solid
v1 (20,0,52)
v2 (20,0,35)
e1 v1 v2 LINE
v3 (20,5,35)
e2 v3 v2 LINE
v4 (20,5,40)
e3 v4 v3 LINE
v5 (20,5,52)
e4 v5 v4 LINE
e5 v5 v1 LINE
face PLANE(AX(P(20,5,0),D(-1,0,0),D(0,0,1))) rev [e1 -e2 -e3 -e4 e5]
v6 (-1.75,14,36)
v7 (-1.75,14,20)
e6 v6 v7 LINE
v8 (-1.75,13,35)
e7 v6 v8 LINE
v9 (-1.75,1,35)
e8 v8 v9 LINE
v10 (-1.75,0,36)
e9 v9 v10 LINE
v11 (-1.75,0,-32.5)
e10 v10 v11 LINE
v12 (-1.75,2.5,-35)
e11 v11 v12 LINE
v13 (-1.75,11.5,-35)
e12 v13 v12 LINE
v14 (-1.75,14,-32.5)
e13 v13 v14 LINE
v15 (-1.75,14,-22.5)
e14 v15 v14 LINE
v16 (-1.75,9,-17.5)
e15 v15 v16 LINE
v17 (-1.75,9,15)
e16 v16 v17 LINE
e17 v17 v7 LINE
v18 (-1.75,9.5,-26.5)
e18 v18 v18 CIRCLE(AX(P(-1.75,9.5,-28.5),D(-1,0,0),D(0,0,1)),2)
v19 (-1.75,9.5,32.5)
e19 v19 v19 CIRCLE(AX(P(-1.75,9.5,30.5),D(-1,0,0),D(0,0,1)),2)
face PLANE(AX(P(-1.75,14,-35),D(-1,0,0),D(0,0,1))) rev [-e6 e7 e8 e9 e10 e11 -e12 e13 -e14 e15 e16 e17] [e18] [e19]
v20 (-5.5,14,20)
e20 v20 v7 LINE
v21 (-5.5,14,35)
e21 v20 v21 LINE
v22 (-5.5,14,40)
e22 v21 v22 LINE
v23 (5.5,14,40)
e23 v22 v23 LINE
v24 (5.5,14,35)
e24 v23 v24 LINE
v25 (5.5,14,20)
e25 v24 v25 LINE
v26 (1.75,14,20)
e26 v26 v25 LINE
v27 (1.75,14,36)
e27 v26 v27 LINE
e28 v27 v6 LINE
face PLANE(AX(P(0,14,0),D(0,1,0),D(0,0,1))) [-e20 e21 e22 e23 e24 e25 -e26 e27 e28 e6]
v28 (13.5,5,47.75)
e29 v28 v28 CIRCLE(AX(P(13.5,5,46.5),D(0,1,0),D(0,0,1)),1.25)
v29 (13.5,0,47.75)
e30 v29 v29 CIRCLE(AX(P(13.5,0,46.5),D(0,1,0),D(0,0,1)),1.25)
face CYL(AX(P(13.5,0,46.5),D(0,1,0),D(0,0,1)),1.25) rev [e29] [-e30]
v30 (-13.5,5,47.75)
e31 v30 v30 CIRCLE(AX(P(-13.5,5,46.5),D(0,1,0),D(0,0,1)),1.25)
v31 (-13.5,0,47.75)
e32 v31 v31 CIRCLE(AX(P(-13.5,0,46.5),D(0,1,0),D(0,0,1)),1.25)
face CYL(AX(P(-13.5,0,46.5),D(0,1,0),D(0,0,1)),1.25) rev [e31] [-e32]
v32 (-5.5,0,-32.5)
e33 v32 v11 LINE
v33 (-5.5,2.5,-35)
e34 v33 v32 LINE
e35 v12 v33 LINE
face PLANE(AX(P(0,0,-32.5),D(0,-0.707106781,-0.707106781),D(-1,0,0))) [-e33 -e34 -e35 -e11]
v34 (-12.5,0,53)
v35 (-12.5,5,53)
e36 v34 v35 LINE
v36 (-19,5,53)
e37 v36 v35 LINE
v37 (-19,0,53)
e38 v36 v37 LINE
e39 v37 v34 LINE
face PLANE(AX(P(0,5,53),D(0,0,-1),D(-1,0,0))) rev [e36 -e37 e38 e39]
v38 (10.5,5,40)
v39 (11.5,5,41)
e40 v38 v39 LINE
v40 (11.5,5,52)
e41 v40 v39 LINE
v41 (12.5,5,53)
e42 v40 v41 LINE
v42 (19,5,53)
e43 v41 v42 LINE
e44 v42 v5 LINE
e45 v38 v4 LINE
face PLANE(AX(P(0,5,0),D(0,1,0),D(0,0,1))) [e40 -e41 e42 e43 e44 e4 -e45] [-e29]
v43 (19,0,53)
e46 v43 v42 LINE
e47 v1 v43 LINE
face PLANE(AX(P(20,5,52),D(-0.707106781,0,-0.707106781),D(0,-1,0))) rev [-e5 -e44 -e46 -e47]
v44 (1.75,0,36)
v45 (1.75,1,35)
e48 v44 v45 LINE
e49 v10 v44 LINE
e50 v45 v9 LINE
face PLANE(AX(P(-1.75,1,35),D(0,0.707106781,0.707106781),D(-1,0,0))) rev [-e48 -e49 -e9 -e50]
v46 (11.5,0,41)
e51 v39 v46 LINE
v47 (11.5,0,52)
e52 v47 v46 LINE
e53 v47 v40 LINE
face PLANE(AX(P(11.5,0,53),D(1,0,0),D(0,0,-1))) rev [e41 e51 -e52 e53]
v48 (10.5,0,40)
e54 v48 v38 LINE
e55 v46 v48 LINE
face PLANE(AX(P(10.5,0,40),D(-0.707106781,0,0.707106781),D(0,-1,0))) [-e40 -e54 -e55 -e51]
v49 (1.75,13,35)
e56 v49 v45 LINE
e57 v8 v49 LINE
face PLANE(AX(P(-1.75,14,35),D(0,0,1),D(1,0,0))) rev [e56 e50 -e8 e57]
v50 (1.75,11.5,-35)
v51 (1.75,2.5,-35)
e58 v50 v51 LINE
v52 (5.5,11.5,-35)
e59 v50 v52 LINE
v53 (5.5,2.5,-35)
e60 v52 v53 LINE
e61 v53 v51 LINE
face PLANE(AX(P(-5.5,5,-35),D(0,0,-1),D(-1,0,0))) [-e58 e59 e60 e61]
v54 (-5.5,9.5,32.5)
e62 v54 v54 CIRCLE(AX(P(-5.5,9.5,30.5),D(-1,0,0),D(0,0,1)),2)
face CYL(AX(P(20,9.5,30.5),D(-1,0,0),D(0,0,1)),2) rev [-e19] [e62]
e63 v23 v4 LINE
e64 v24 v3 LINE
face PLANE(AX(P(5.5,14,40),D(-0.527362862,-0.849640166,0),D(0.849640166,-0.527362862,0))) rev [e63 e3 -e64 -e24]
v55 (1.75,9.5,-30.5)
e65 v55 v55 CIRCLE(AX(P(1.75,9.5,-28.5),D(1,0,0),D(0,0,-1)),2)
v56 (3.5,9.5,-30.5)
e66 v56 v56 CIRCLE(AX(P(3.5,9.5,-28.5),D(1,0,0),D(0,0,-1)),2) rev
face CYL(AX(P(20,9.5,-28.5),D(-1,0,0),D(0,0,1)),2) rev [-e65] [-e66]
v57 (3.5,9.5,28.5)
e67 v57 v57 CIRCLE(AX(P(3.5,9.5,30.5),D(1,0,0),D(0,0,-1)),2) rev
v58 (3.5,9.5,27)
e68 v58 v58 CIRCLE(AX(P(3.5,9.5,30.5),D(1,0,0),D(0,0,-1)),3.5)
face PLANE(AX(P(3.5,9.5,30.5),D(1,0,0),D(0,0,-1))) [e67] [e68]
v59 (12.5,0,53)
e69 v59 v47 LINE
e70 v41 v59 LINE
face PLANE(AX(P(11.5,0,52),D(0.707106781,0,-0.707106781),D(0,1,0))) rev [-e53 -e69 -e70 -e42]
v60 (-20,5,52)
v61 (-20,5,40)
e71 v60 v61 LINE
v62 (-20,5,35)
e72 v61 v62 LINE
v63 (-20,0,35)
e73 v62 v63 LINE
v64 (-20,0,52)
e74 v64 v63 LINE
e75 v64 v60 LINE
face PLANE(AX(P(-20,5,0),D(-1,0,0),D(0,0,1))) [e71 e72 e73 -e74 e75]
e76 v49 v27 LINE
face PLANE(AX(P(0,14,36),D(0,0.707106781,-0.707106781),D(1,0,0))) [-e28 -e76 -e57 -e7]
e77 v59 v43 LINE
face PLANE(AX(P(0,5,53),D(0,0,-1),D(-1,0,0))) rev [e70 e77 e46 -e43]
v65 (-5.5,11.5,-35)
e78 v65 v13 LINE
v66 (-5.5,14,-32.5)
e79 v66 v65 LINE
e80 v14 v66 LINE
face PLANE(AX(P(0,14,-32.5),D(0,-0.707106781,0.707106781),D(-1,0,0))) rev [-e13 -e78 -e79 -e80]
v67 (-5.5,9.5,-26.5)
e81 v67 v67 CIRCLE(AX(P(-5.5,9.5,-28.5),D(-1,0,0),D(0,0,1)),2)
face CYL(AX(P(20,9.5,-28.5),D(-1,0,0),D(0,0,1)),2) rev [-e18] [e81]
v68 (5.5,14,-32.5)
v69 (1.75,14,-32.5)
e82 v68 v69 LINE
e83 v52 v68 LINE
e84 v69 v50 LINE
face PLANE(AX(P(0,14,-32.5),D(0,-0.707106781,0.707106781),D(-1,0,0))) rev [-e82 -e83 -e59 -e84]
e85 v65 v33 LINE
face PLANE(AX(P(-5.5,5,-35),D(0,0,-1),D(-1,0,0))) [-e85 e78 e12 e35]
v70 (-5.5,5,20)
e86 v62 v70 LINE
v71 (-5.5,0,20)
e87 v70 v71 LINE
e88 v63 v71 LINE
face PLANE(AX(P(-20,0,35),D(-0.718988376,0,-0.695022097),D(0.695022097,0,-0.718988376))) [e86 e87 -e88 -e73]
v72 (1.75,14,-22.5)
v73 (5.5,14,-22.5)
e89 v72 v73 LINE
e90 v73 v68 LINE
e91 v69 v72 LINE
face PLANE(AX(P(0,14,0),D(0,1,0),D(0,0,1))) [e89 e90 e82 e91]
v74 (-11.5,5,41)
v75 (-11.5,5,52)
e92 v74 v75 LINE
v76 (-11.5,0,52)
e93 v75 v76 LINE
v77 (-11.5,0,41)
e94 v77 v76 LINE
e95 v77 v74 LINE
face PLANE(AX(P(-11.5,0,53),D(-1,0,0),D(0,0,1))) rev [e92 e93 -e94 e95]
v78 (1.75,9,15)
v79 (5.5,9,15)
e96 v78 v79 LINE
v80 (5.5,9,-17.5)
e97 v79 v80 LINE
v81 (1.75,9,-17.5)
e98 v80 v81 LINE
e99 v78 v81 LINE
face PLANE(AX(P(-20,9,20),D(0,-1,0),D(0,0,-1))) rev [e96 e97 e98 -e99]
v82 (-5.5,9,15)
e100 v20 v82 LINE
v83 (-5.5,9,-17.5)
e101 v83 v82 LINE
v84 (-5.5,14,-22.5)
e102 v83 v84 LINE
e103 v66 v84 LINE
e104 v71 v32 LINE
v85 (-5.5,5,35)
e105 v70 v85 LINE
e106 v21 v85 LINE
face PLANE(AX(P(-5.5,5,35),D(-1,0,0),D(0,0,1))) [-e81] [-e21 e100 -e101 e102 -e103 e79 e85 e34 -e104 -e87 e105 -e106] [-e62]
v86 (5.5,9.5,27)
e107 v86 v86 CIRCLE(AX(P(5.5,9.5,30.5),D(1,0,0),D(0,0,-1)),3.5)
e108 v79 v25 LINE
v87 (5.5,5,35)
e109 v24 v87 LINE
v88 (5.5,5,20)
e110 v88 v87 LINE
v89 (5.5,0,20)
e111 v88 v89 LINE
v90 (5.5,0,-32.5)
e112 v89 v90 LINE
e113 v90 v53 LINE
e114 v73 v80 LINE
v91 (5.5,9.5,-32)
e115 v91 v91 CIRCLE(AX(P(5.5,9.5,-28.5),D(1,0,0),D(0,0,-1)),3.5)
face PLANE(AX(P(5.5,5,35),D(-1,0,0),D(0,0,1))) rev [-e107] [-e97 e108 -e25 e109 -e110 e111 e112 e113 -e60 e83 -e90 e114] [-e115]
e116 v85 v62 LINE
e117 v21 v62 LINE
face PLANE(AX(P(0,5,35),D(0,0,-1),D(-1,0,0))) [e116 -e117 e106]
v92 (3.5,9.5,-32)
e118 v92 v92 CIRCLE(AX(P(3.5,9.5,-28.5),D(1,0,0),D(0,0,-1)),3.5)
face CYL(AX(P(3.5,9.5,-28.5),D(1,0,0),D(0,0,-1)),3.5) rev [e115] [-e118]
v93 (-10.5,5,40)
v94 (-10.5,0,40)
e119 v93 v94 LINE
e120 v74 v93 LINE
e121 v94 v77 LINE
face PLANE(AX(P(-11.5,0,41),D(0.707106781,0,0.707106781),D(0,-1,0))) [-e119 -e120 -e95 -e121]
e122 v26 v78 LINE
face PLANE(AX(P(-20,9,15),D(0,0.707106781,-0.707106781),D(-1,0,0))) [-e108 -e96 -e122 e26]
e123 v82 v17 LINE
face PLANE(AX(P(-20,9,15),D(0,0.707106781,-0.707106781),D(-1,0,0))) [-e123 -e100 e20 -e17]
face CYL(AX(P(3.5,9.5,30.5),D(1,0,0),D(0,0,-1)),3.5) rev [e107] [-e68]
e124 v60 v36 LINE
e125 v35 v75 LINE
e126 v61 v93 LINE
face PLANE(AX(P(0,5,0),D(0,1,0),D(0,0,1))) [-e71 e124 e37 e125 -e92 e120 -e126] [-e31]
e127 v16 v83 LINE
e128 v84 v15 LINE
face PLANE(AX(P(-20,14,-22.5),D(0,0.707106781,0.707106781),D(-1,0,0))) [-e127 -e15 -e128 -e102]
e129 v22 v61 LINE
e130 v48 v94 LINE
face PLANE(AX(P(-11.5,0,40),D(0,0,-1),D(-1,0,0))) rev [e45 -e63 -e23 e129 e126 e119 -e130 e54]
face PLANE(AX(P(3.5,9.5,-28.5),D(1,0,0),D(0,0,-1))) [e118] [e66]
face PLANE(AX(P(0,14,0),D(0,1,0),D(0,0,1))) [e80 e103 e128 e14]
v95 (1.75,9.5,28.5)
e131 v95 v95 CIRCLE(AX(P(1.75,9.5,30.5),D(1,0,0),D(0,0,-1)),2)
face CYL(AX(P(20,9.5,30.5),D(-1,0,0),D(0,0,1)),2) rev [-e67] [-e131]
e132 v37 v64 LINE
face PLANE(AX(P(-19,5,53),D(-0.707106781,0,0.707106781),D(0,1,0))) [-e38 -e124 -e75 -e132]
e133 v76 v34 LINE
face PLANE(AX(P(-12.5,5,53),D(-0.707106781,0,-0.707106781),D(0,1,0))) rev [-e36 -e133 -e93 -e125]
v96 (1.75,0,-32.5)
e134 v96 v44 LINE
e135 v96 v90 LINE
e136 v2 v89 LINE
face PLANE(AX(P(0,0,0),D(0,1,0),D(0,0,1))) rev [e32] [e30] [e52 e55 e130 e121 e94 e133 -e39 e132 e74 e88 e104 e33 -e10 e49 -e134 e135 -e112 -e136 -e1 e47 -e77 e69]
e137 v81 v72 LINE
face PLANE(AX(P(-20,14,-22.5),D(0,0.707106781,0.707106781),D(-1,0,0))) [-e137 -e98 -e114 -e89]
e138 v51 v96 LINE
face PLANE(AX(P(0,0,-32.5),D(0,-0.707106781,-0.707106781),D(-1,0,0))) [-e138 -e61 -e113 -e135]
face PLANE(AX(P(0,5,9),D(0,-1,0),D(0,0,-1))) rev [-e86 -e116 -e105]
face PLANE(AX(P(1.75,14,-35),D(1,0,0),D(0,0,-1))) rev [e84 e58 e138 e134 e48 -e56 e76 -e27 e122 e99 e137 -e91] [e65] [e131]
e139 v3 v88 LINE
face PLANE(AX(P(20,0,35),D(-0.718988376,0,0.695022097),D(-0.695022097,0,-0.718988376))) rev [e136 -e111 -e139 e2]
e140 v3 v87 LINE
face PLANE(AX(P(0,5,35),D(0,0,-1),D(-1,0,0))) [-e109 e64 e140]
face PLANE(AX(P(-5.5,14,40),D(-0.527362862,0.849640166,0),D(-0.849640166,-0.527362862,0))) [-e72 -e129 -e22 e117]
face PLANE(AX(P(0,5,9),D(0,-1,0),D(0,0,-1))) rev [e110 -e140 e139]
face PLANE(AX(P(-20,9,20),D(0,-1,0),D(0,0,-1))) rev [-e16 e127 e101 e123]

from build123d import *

# Parameters (mm, degrees)
SKETCH1_W           = 11
SKETCH1_H           = 70
SKETCH1_W_2         = 40
SKETCH1_H_2         = 18
BOSS_EXTRUDE1_DEPTH = 5
SKETCH3_W           = 23
SKETCH3_H           = 13
CUT_EXTRUDE2_DEPTH  = 57.868268832
SKETCH4_R           = 1.25
CUT_EXTRUDE3_DEPTH  = 57.868268832
SKETCH5_W           = 11
SKETCH5_H           = 75
BOSS_EXTRUDE2_DEPTH = 9
SKETCH6_W           = 3.5
SKETCH6_H           = 70
CUT_EXTRUDE4_DEPTH  = 59.352377844
SKETCH7_R           = 2
CUT_EXTRUDE5_DEPTH  = 61.458663564
RIB2_REACH          = 80.873
SKETCH8_WALL_W      = 176.81268046
SKETCH8_WALL_H      = 5
RIB4_REACH          = 80.873
SKETCH9_WALL_W      = 176.81268046
SKETCH9_WALL_H      = 5
RIB8_REACH          = 60.352
SKETCH10_WALL_W     = 139.567401732
SKETCH10_WALL_H     = 5
SKETCH14_W          = 42.5
SKETCH14_H          = 5
CUT_EXTRUDE6_DEPTH  = 61.458663564
CHAMFER9_SIZE       = 5
CHAMFER10_SIZE      = 2.5
CHAMFER11_SIZE      = 1
CHAMFER12_SIZE      = 1
SKETCH15_R          = 3.5
CUT_EXTRUDE7_DEPTH  = 2
CHAMFER14_SIZE      = 1


with BuildPart() as part:
    # Sketch1 → Boss-Extrude1 (new body)
    with BuildSketch(Plane(origin=(0, 0, 0), x_dir=(1, 0, 0), z_dir=(0, 1, 0))):
        Rectangle(SKETCH1_W, SKETCH1_H)
        with Locations((0, -44)):
            Rectangle(SKETCH1_W_2, SKETCH1_H_2)
    extrude(amount=BOSS_EXTRUDE1_DEPTH)

    # Sketch3 → Cut-Extrude2 (cut, through all)
    with BuildSketch(Plane(origin=(0, 5, 0), x_dir=(1, 0, 0), z_dir=(0, 1, 0))):
        with Locations((0, -46.5)):
            Rectangle(SKETCH3_W, SKETCH3_H)
    extrude(amount=-CUT_EXTRUDE2_DEPTH, mode=Mode.SUBTRACT)

    # Sketch4 → Cut-Extrude3 (cut, through all)
    with BuildSketch(Plane(origin=(0, 5, 0), x_dir=(1, 0, 0), z_dir=(0, 1, 0))):
        with Locations(Location((-13.5, -46.5, 0), (0, 0, 270))):
            Circle(SKETCH4_R)
        with Locations(Location((13.5, -46.5, 0), (0, 0, 270))):
            Circle(SKETCH4_R)
    extrude(amount=-CUT_EXTRUDE3_DEPTH, mode=Mode.SUBTRACT)

    # Sketch5 → Boss-Extrude2 (add)
    with BuildSketch(Plane(origin=(0, 5, 0), x_dir=(1, 0, 0), z_dir=(0, 1, 0))):
        with Locations((0, -2.5)):
            Rectangle(SKETCH5_W, SKETCH5_H)
    extrude(amount=BOSS_EXTRUDE2_DEPTH)

    # Sketch6 → Cut-Extrude4 (cut, through all)
    with BuildSketch(Plane.XZ):
        Rectangle(SKETCH6_W, SKETCH6_H)
    extrude(amount=-CUT_EXTRUDE4_DEPTH, mode=Mode.SUBTRACT)

    # Sketch7 → Cut-Extrude5 (cut, through all)
    with BuildSketch(Plane.ZY.offset(5.5)):
        with Locations((-28.5, 9.5)):
            Circle(SKETCH7_R)
        with Locations((30.5, 9.5)):
            Circle(SKETCH7_R)
    extrude(amount=-CUT_EXTRUDE5_DEPTH, mode=Mode.SUBTRACT)

    # Sketch8 wall → Rib2 (add, up to next)
    with BuildSketch(Plane(origin=(-12.75, 9.5, 40), x_dir=(-0.849640166198, -0.527362861778, 0), z_dir=(0.527362861778, -0.849640166198, 0)), mode=Mode.PRIVATE) as rib2_sk1:
        with Locations((0, 2.5)):
            Rectangle(SKETCH8_WALL_W, SKETCH8_WALL_H)
    rib2_tool1 = extrude(rib2_sk1.sketch, amount=RIB2_REACH, mode=Mode.PRIVATE) - part.part
    add(rib2_tool1.solids().sort_by_distance((-12.75, 9.5, 40))[0])

    # Sketch9 wall → Rib4 (add, up to next)
    with BuildSketch(Plane(origin=(12.75, 9.5, 40), x_dir=(0.849640166198, -0.527362861778, 0), z_dir=(0.527362861778, 0.849640166198, 0)), mode=Mode.PRIVATE) as rib4_sk1:
        with Locations((0, 2.5)):
            Rectangle(SKETCH9_WALL_W, SKETCH9_WALL_H)
    rib4_tool1 = extrude(rib4_sk1.sketch, amount=-RIB4_REACH, mode=Mode.PRIVATE) - part.part
    add(rib4_tool1.solids().sort_by_distance((12.75, 9.5, 40))[0])

    # Sketch10 wall → Rib8 (add, up to next)
    with BuildSketch(Plane(origin=(-12.75, 0, 27.5), x_dir=(0.695022096847, 0, -0.718988376049), z_dir=(0.718988376049, 0, 0.695022096847)), mode=Mode.PRIVATE) as rib8_sk1:
        with Locations((0, 2.5)):
            Rectangle(SKETCH10_WALL_W, SKETCH10_WALL_H)
    rib8_tool1 = extrude(rib8_sk1.sketch, amount=RIB8_REACH, mode=Mode.PRIVATE) - part.part
    rib8 = rib8_tool1.solids().sort_by_distance((-12.75, 0, 27.5))[0]
    add(rib8)

    # Mirror1: Rib8 across plane
    add(rib8.mirror(Plane(origin=(0, 0, 0), x_dir=(0, 0, 1), z_dir=(1, 0, 0))))

    # Sketch14 → Cut-Extrude6 (cut, through all)
    with BuildSketch(Plane(origin=(5.5, 0, 0), x_dir=(0, 0, -1), z_dir=(1, 0, 0))):
        with Locations((1.25, 11.5)):
            Rectangle(SKETCH14_W, SKETCH14_H)
    extrude(amount=-CUT_EXTRUDE6_DEPTH, mode=Mode.SUBTRACT)

    # Chamfer9
    chamfer9_edges = [part.edges().sort_by_distance(p)[0] for p in [
        (3.625, 9, -22.5),
        (-3.625, 9, -22.5),
        (3.625, 9, 20),
        (-3.625, 9, 20),
    ]]
    chamfer(chamfer9_edges, length=CHAMFER9_SIZE - 0.0001)  # a hair under: the kernel refuses the full size

    # Chamfer10
    chamfer10_edges = [part.edges().sort_by_distance(p)[0] for p in [
        (-3.625, 0, -35),
        (3.625, 14, -35),
        (-3.625, 14, -35),
        (3.625, 0, -35),
    ]]
    chamfer(chamfer10_edges, length=CHAMFER10_SIZE)

    # Chamfer11
    chamfer11_edges = [part.edges().sort_by_distance(p)[0] for p in [
        (-11.5, 2.5, 53),
        (11.5, 2.5, 53),
        (-20, 2.5, 53),
        (20, 2.5, 53),
    ]]
    chamfer(chamfer11_edges, length=CHAMFER11_SIZE)

    # Chamfer12
    chamfer12_edges = [part.edges().sort_by_distance(p)[0] for p in [
        (-11.5, 2.5, 40),
        (11.5, 2.5, 40),
    ]]
    chamfer(chamfer12_edges, length=CHAMFER12_SIZE)

    # Sketch15 → Cut-Extrude7 (cut)
    with BuildSketch(Plane(origin=(5.5, 0, 0), x_dir=(0, 0, -1), z_dir=(1, 0, 0))):
        with Locations((28.5, 9.5)):
            Circle(SKETCH15_R)
        with Locations((-30.5, 9.5)):
            Circle(SKETCH15_R)
    extrude(amount=-CUT_EXTRUDE7_DEPTH, mode=Mode.SUBTRACT)

    # Chamfer14
    chamfer14_edges = [part.edges().sort_by_distance(p)[0] for p in [
        (0, 14, 35),
        (0, 0, 35),
    ]]
    chamfer(chamfer14_edges, length=CHAMFER14_SIZE)


solid = part.part
